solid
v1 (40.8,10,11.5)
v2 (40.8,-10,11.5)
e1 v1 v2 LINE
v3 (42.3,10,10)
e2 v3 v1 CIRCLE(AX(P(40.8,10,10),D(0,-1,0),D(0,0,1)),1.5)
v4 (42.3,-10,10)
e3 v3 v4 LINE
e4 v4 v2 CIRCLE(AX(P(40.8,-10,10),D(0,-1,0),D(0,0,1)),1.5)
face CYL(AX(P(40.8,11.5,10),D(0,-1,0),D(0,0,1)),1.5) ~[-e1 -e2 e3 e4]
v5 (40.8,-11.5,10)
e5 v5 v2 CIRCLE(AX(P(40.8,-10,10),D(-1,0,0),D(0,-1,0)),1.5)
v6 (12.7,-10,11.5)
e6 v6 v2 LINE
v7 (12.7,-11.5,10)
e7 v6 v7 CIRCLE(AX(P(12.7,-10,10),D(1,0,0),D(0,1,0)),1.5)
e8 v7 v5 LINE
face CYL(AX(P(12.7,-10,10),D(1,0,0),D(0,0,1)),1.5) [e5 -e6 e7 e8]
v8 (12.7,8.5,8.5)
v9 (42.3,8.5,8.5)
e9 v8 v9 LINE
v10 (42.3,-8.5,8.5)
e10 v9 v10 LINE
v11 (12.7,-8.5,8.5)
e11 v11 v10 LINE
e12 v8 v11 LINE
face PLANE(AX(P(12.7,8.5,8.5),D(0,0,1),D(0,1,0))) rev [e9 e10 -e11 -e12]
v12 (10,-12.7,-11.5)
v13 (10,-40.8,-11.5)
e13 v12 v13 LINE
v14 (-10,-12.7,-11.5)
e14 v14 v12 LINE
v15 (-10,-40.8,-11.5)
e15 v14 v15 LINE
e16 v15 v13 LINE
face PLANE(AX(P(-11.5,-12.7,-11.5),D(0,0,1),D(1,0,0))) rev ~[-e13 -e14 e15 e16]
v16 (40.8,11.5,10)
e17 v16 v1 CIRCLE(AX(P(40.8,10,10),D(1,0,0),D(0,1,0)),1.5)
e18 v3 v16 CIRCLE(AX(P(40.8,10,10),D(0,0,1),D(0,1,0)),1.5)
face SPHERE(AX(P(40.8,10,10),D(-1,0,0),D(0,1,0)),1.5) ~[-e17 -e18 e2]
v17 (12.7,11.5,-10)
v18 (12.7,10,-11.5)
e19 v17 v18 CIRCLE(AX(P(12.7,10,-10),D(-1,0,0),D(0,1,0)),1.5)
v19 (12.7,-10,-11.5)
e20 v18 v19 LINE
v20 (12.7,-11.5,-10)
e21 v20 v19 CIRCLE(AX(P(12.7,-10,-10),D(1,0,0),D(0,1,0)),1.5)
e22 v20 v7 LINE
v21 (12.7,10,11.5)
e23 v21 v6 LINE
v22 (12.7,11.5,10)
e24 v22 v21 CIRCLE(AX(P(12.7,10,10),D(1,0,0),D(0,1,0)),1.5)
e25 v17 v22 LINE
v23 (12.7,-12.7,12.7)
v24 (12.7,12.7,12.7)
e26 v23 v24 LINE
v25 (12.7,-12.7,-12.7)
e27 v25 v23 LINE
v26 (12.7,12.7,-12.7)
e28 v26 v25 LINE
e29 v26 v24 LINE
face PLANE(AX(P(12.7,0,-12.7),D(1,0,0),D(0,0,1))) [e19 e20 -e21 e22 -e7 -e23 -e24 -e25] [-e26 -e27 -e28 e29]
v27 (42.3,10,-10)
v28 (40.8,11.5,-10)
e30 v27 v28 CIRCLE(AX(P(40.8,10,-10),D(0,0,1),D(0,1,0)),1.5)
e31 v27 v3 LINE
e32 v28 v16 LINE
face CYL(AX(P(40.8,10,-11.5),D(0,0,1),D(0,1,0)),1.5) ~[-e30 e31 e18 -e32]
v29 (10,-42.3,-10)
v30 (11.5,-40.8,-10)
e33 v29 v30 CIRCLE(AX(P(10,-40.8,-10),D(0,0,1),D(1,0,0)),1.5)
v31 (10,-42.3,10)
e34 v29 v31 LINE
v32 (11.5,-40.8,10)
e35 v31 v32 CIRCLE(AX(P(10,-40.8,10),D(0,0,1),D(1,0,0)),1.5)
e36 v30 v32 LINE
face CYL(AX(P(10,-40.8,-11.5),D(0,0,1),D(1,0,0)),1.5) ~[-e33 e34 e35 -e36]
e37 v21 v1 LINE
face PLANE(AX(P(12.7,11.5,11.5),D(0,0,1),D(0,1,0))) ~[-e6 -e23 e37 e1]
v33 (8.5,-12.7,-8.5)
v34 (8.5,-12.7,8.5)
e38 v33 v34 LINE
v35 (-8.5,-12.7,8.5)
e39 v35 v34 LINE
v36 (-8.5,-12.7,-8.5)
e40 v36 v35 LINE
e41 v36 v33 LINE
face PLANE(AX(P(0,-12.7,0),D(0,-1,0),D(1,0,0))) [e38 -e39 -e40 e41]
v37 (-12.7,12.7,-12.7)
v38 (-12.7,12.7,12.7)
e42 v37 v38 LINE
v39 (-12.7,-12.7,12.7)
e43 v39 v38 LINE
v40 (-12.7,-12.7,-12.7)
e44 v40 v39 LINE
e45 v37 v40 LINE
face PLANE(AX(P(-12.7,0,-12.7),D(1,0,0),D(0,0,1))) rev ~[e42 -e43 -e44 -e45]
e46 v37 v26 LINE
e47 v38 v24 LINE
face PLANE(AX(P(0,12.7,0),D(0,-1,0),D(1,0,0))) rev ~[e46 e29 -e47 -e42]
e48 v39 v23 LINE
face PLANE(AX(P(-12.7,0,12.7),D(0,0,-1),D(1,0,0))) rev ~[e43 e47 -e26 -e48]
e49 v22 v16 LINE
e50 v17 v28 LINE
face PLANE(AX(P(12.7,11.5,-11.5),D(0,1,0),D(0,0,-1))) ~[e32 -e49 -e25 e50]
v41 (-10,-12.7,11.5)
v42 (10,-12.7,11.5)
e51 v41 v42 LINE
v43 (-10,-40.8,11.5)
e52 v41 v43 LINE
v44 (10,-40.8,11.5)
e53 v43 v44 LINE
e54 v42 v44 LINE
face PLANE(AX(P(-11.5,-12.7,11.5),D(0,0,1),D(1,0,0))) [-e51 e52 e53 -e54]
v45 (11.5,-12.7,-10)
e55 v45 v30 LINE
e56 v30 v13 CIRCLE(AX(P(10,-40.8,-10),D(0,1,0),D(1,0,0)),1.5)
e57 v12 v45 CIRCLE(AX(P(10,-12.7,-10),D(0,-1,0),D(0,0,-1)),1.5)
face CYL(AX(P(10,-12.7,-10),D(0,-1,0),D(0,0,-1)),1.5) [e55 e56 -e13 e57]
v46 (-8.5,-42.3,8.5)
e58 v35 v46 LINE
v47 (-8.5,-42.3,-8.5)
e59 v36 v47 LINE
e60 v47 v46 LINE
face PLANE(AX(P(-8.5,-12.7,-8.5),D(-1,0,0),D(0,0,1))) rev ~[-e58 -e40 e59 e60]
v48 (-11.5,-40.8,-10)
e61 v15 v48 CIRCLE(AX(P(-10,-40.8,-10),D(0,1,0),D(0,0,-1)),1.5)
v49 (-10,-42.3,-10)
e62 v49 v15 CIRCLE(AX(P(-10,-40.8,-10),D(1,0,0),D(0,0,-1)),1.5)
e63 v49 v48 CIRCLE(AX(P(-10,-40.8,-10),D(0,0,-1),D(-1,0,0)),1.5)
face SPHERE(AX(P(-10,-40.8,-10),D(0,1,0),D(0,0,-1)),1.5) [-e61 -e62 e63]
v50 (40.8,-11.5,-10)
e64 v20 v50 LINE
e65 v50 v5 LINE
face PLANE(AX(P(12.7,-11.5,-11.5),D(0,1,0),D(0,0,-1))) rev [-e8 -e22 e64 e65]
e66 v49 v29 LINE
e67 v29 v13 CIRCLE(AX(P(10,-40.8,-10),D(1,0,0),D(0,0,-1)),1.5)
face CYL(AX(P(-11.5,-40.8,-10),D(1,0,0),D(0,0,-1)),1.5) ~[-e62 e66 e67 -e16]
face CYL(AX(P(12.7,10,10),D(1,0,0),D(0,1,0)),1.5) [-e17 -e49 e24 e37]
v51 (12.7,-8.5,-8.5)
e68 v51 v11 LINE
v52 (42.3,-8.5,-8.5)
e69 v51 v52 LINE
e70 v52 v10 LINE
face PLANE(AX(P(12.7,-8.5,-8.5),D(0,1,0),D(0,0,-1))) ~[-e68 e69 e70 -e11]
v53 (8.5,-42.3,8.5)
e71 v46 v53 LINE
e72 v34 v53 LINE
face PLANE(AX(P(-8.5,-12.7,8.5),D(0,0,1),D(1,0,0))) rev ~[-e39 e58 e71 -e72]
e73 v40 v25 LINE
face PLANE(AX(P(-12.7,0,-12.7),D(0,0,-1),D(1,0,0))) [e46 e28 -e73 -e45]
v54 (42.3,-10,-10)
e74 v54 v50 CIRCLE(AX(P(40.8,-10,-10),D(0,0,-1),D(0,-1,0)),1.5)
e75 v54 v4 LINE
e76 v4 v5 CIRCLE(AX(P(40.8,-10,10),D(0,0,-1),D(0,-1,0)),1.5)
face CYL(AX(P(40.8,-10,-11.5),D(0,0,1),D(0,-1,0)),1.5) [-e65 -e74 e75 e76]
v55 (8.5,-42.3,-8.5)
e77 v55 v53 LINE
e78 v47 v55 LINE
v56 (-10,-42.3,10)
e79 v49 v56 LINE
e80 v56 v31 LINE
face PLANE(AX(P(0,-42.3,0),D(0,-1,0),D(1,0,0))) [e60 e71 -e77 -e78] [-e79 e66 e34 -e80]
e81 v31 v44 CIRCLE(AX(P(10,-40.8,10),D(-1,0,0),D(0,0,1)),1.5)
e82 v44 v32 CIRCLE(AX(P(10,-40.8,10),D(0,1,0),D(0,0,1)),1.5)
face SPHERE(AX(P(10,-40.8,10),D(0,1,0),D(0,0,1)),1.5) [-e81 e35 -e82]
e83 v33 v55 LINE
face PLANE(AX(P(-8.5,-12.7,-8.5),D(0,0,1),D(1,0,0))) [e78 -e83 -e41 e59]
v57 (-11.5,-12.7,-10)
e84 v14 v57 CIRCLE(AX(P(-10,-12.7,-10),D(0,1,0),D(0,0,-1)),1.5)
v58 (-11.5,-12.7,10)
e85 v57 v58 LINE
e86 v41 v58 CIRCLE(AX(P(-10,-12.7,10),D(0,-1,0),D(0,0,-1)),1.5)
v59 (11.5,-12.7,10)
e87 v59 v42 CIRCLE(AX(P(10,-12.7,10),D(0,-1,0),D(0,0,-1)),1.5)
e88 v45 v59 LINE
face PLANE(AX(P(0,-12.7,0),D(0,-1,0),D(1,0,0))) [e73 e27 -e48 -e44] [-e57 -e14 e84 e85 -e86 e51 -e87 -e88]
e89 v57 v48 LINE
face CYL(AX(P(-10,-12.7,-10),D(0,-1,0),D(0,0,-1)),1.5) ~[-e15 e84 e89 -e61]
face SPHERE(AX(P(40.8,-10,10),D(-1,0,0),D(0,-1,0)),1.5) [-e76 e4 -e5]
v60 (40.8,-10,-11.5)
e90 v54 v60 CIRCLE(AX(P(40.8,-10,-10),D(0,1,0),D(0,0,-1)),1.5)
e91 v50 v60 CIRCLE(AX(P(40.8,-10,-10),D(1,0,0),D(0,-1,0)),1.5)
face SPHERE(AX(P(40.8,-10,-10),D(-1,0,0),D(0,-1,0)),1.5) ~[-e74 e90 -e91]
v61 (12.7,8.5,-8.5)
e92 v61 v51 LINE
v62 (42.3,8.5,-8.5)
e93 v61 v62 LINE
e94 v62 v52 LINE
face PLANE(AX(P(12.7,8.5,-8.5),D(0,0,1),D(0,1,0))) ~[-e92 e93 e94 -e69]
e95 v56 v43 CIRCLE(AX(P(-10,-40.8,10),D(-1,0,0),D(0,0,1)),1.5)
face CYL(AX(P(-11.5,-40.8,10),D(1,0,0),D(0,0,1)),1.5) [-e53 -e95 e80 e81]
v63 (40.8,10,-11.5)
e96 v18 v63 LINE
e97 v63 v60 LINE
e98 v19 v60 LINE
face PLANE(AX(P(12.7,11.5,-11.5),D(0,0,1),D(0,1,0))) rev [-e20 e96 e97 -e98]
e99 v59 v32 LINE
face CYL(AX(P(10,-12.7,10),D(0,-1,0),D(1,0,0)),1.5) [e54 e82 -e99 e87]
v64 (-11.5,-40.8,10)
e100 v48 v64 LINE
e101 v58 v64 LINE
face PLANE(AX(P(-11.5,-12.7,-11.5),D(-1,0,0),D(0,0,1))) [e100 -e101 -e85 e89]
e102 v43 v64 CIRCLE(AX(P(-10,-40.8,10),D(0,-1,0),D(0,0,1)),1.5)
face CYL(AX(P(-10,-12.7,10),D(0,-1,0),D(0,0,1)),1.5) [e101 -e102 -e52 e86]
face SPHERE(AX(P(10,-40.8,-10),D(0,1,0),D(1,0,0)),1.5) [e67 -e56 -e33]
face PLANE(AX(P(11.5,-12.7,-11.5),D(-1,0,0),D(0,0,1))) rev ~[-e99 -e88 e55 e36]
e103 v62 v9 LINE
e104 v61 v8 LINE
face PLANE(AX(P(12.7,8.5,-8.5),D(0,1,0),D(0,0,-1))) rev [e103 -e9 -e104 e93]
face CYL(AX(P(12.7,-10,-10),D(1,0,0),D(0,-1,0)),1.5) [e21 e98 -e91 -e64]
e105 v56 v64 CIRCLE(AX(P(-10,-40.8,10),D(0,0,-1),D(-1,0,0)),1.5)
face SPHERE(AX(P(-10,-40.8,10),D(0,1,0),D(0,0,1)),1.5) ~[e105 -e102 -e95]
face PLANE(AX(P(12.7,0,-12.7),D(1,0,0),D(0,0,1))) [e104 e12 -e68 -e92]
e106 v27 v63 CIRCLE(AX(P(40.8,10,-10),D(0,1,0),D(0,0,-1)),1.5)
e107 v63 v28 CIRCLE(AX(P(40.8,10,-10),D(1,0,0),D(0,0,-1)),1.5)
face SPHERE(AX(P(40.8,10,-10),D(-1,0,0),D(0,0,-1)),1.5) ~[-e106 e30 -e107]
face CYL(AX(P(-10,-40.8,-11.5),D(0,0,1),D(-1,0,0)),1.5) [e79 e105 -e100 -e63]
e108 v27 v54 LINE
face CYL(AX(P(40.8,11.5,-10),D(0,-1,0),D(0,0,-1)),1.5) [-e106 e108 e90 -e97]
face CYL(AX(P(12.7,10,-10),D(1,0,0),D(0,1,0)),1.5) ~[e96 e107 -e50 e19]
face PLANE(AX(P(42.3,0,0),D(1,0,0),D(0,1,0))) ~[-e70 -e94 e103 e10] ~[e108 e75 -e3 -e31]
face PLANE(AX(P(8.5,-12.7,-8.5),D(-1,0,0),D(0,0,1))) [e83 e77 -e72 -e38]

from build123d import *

# Parameters (mm, degrees)
F0_W     = 25.4
F0_H     = 25.4
F1_DEPTH = 12.7
F2_W     = 23
F2_H     = 23
F2_W_2   = 17
F2_H_2   = 17
F3_DEPTH = 29.6
F4_R     = 1.5


# Not quite as in the source:
# - a pattern or mirror of a feature is missing from the dataset's text; its kind, count and spacing are read off the source's solid


with BuildPart() as f1:
    # F0 (on Front) → F1 (new body, symmetric)
    with BuildSketch(Plane.XZ):
        Rectangle(F0_W, F0_H)
    extrude(amount=F1_DEPTH, both=True)

    # F2 (on face) → F3 (join)
    with BuildSketch(Plane.XZ.offset(12.7)):
        Rectangle(F2_W, F2_H)
        Rectangle(F2_W_2, F2_H_2, mode=Mode.SUBTRACT)
    f3 = extrude(amount=F3_DEPTH)

    # F3_copies: F3 across plane
    add(f3.mirror(Plane(origin=(0, 0, 0), x_dir=(-0.7071067812, 0.7071067812, 0), z_dir=(0.7071067812, 0.7071067812, 0))))

    # F4
    f4_edges = [f1.edges().sort_by_distance(p)[0] for p in [
        (11.5, -27.5, 11.5),
        (11.5, -27.5, -11.5),
        (-11.5, -27.5, 11.5),
        (-11.5, -27.5, -11.5),
        (0, -42.3, 11.5),
        (11.5, -42.3, 0),
        (0, -42.3, -11.5),
        (-11.5, -42.3, 0),
        (27.5, -11.5, -11.5),
        (27.5, -11.5, 11.5),
        (42.3, -11.5, 0),
        (27.5, 11.5, -11.5),
        (42.3, 0, -11.5),
        (27.5, 11.5, 11.5),
        (42.3, 11.5, 0),
        (42.3, 0, 11.5),
    ]]
    fillet(f4_edges, radius=F4_R)


solid = f1.part
